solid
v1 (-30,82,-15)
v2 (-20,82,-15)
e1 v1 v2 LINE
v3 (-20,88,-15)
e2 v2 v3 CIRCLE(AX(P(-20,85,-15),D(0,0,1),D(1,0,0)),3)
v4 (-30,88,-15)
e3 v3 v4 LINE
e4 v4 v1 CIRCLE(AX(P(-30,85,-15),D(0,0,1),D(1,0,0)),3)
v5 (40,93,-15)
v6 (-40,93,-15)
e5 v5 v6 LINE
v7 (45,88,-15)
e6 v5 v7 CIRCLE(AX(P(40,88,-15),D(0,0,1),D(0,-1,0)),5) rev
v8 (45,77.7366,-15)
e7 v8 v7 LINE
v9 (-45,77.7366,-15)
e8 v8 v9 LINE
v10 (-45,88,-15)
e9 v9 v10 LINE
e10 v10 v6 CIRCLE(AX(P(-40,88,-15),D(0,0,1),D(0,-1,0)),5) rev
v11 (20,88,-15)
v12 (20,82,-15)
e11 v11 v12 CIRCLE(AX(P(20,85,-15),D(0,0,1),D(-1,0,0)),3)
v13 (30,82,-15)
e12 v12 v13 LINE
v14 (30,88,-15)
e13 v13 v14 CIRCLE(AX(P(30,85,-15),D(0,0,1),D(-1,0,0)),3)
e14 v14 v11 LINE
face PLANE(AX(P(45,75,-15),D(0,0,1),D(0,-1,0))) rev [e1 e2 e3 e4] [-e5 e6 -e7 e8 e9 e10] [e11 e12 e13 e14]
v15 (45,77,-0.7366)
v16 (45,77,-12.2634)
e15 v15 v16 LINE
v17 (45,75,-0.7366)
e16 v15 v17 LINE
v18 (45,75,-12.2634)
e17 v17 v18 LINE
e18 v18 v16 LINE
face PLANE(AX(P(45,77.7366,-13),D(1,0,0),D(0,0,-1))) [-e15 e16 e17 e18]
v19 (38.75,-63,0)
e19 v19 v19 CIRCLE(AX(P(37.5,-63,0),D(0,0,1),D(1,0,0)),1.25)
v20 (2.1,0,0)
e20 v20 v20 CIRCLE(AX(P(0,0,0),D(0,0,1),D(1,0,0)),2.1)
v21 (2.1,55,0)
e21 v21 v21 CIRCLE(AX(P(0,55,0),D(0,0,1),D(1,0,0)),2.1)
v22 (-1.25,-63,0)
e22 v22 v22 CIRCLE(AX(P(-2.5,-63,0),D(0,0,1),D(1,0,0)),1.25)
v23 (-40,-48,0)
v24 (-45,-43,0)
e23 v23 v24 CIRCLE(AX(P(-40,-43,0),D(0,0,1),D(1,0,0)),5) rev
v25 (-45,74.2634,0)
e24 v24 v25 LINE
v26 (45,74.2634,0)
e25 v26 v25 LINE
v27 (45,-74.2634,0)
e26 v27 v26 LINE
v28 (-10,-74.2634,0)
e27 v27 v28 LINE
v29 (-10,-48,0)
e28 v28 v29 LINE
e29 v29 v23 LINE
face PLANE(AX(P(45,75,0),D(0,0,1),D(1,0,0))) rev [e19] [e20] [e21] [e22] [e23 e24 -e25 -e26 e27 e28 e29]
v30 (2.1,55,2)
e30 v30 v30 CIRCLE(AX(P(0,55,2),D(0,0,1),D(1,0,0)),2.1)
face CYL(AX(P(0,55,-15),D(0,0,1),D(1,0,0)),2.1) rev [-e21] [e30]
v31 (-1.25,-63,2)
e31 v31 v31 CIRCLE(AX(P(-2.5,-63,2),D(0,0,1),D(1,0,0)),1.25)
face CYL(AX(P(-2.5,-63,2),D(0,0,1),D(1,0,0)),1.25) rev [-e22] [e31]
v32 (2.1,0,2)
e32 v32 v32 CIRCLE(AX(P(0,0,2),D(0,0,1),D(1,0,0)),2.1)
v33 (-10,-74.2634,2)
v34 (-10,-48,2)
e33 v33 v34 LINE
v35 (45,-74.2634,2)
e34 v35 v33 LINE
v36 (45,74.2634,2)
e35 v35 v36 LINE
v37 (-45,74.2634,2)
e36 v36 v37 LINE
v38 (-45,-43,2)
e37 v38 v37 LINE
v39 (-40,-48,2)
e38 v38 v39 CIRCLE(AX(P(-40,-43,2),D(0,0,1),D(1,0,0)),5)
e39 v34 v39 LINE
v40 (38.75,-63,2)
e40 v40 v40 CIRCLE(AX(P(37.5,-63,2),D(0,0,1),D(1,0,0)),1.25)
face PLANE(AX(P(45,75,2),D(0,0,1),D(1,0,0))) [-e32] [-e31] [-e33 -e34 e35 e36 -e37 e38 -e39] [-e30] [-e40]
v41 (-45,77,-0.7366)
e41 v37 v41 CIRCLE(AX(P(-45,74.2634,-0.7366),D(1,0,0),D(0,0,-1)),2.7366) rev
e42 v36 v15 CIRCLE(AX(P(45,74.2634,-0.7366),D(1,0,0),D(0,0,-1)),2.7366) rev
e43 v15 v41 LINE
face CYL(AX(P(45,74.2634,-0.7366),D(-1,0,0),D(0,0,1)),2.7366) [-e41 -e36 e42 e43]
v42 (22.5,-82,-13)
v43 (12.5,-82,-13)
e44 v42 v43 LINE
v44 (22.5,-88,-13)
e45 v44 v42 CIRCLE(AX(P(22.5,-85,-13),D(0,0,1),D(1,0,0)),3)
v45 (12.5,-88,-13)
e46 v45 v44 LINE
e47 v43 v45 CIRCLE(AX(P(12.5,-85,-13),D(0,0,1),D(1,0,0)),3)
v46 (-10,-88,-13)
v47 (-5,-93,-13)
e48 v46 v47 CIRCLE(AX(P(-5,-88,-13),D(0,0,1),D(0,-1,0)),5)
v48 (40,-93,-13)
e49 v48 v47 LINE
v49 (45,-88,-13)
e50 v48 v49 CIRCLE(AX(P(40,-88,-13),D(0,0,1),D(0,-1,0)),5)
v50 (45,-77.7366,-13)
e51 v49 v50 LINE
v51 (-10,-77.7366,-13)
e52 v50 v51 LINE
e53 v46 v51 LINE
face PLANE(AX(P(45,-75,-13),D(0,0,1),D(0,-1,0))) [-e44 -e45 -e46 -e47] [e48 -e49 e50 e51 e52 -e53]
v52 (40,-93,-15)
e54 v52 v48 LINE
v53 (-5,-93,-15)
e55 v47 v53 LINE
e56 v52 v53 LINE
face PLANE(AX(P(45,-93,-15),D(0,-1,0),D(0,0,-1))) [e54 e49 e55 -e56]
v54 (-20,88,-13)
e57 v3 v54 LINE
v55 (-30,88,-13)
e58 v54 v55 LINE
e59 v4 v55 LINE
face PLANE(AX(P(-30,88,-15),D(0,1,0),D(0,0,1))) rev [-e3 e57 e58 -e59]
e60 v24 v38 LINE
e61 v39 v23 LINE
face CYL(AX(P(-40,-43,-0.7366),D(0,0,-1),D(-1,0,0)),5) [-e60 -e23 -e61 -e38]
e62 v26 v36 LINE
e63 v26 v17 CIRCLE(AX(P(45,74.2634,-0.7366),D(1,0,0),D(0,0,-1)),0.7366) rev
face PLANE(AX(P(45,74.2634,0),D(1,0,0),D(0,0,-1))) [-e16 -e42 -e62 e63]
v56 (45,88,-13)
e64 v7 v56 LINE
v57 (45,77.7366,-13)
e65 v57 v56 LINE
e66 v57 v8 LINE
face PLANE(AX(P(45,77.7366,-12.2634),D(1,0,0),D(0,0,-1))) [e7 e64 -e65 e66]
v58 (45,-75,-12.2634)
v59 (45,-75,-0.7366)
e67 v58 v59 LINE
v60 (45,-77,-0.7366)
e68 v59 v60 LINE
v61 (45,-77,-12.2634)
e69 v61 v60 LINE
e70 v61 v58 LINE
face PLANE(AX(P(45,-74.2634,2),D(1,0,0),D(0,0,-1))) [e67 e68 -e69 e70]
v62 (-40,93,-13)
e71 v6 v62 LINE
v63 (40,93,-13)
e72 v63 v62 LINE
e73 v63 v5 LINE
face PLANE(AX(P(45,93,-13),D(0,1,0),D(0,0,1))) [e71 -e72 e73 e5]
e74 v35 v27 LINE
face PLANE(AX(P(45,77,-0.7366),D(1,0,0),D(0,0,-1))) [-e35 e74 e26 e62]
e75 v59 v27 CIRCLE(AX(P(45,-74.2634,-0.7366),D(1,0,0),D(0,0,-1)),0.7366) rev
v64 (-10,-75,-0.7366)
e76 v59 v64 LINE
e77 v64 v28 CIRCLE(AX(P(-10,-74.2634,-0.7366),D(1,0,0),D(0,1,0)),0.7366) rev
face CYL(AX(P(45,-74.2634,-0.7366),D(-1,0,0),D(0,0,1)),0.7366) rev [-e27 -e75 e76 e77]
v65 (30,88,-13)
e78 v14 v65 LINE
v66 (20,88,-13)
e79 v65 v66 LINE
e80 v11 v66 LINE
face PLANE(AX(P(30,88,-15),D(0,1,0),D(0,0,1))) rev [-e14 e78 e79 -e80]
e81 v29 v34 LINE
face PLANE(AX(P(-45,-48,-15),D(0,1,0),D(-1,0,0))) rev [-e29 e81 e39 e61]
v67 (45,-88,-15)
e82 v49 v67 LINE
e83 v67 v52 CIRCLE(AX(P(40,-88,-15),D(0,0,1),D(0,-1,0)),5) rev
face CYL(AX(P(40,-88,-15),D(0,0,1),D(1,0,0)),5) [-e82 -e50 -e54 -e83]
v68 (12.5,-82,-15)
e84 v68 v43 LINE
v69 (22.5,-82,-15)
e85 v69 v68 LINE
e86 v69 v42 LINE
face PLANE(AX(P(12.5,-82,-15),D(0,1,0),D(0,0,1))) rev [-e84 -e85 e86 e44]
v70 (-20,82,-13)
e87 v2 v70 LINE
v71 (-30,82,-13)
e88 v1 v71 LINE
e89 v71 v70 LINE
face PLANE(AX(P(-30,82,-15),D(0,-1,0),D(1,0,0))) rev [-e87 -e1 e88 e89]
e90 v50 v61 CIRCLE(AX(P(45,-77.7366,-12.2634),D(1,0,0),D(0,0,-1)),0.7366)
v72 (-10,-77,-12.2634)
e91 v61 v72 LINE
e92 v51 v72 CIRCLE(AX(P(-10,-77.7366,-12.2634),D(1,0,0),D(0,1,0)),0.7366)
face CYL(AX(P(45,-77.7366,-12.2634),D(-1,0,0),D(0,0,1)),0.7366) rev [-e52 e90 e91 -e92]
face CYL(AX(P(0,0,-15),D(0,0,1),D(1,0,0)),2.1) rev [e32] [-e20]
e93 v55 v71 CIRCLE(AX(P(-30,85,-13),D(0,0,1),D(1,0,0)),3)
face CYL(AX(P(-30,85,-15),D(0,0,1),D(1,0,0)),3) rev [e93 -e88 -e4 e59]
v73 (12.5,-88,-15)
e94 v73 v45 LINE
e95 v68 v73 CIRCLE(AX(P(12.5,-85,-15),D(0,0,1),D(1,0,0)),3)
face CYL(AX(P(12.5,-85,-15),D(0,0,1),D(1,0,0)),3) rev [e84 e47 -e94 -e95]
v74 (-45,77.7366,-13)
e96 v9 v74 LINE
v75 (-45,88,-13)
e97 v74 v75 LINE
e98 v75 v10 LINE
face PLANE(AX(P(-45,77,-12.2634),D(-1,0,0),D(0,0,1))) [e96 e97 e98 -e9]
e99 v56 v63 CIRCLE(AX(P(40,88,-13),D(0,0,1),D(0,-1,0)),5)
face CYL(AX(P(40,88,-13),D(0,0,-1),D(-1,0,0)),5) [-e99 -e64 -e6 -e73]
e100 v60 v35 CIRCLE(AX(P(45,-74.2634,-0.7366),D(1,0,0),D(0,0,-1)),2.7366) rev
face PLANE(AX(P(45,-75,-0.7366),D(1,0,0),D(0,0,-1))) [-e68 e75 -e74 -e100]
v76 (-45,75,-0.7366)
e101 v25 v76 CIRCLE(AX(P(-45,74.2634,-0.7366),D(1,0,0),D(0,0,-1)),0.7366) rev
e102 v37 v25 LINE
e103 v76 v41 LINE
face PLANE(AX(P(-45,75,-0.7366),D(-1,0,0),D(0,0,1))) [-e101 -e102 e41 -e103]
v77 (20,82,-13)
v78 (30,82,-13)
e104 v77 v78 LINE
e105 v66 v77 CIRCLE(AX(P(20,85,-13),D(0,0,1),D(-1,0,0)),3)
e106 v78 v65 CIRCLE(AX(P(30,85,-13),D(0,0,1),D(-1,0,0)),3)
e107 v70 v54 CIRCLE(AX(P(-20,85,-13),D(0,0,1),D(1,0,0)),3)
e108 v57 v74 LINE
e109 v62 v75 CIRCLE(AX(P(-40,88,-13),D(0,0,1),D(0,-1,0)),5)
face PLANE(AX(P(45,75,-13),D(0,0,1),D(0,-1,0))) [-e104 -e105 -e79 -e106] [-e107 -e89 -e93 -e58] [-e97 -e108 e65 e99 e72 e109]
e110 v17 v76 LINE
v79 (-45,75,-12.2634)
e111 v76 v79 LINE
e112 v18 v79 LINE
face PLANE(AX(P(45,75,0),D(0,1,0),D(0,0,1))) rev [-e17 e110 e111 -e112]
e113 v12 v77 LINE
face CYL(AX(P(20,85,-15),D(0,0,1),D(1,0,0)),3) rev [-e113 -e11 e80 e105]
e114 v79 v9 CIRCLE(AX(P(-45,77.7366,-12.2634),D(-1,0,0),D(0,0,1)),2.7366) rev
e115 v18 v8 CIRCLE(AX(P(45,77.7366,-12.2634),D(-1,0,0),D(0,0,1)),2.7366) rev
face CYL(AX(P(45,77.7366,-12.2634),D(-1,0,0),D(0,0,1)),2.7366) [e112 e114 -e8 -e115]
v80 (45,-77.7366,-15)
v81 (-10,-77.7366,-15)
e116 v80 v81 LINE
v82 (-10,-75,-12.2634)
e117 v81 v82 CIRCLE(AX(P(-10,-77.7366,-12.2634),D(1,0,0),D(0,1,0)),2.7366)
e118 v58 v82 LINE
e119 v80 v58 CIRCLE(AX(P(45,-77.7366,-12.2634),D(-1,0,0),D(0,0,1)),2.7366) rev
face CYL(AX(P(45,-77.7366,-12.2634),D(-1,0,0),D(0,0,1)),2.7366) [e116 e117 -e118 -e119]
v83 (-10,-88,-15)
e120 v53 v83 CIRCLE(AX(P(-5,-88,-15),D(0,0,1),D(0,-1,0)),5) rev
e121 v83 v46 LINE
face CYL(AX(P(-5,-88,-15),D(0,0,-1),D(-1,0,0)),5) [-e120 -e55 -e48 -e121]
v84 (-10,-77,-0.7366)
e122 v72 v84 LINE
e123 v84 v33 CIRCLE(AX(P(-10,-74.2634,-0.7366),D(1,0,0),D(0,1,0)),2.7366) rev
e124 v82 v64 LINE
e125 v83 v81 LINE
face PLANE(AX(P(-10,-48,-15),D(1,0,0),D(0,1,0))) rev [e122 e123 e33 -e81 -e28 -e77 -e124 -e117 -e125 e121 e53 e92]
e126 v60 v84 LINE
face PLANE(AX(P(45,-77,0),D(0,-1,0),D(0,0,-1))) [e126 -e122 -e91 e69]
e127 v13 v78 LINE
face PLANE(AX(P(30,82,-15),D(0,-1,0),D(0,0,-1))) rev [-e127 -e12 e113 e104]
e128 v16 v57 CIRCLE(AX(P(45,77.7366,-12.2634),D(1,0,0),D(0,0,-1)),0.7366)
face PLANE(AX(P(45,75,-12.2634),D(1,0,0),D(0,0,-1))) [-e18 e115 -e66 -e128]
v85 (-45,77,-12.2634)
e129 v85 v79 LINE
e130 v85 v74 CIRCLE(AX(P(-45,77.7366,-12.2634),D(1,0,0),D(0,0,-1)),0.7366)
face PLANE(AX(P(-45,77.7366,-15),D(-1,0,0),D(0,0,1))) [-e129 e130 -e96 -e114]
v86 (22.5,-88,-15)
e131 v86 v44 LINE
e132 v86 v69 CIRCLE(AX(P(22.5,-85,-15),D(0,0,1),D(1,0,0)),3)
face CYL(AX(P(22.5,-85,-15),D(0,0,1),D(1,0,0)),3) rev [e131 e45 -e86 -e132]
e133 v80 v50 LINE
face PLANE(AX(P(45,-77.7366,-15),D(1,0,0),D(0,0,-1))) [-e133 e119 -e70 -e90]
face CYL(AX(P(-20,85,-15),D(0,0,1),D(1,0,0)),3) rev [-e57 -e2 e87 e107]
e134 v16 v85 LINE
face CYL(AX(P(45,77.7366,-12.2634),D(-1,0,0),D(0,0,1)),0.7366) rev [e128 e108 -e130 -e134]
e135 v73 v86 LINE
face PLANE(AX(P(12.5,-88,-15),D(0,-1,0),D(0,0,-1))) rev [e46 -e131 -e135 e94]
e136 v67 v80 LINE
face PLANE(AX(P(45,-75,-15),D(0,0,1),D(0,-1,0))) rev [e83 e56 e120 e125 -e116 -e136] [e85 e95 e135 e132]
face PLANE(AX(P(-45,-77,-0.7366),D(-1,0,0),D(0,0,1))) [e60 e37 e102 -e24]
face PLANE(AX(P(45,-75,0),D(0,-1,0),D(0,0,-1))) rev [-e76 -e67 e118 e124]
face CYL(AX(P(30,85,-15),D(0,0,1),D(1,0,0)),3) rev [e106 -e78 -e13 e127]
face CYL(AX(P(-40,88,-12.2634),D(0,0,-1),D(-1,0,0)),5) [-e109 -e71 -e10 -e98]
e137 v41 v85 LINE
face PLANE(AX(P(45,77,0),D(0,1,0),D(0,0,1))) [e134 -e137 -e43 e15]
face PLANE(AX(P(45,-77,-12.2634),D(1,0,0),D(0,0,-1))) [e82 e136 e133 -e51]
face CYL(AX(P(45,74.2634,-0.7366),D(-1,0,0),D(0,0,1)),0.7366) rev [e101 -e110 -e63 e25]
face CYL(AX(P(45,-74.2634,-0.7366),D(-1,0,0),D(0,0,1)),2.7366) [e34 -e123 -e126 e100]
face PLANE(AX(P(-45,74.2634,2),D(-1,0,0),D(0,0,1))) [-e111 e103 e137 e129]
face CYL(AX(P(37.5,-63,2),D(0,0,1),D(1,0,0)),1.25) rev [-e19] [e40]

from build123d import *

# Parameters (mm, degrees)
SM_BASE_FLANGE_1_DEPTH = 45
SKETCH_3_R             = 2.1
CUT_EXTRUDE_1_DEPTH    = 105.70434566
SKETCH_4_W             = 35
SKETCH_4_H             = 45
CUT_EXTRUDE_2_DEPTH    = 105.70434566
M3X0_5_1_D             = 2.5
M3X0_5_1_DEPTH         = 7.5
M3X0_5_1_TIP           = 0.751075774
CUT_EXTRUDE_3_DEPTH    = 105.398275848
FILLET_1_R             = 5


# Sheet-metal steps are written as plain solids
with BuildPart() as part:
    # Sketch 1 → 基体-法兰1 (new, symmetric)
    with BuildSketch(Plane(origin=(0, 0, 0), x_dir=(0, 0, -1), z_dir=(1, 0, 0))):
        with BuildLine():
            Line((15, 93), (15, 77.7366))
            ThreePointArc((15, 77.7366), (14.198468417, 75.801531583), (12.2634, 75))
            Line((12.2634, 75), (0.7366, 75))
            ThreePointArc((0.7366, 75), (0.215745145, 74.784254855), (0, 74.2634))
            Line((0, 74.2634), (0, -74.2634))
            ThreePointArc((0, -74.2634), (0.215745145, -74.784254855), (0.7366, -75))
            Line((0.7366, -75), (12.2634, -75))
            ThreePointArc((12.2634, -75), (14.198468417, -75.801531583), (15, -77.7366))
            Line((15, -77.7366), (15, -93))
            Line((15, -93), (13, -93))
            Line((13, -93), (13, -77.7366))
            ThreePointArc((13, -77.7366), (12.784254855, -77.215745145), (12.2634, -77))
            Line((12.2634, -77), (0.7366, -77))
            ThreePointArc((0.7366, -77), (-1.198468417, -76.198468417), (-2, -74.2634))
            Line((-2, -74.2634), (-2, 74.2634))
            ThreePointArc((-2, 74.2634), (-1.198468417, 76.198468417), (0.7366, 77))
            Line((0.7366, 77), (12.2634, 77))
            ThreePointArc((12.2634, 77), (12.784254855, 77.215745145), (13, 77.7366))
            Line((13, 77.7366), (13, 93))
            Line((13, 93), (15, 93))
        make_face()
    extrude(amount=SM_BASE_FLANGE_1_DEPTH, both=True)

    # 草图3 → 切除-拉伸1 (cut, through all)
    with BuildSketch(Plane.XY.offset(2)):
        with Locations((0, 55)):
            Circle(SKETCH_3_R)
        Circle(SKETCH_3_R)
    extrude(amount=-CUT_EXTRUDE_1_DEPTH, mode=Mode.SUBTRACT)

    # 草图4 → 切除-拉伸2 (cut, through all)
    with BuildSketch(Plane.XY.offset(2)):
        with Locations((-27.5, -70.5)):
            Rectangle(SKETCH_4_W, SKETCH_4_H)
    extrude(amount=-CUT_EXTRUDE_2_DEPTH, mode=Mode.SUBTRACT)

    # M3x0.5 螺纹孔1
    with Locations(Plane.XY.offset(2)):
        with Locations((-2.5, -63), (37.5, -63)):
            Hole(M3X0_5_1_D / 2, depth=M3X0_5_1_DEPTH)
            with Locations((0, 0, -(M3X0_5_1_DEPTH + M3X0_5_1_TIP / 2))):  # 118° drill point
                Cone(0, M3X0_5_1_D / 2, M3X0_5_1_TIP, mode=Mode.SUBTRACT)

    # 草图7 → 切除-拉伸3 (cut, through all)
    with BuildSketch(Plane.XY.offset(-13)):
        with BuildLine():
            Line((-30, 88), (-20, 88))
            ThreePointArc((-20, 88), (-17, 85), (-20, 82))
            Line((-20, 82), (-30, 82))
            ThreePointArc((-30, 82), (-33, 85), (-30, 88))
        make_face()
        with BuildLine():
            Line((30, 88), (20, 88))
            ThreePointArc((20, 88), (17, 85), (20, 82))
            Line((20, 82), (30, 82))
            ThreePointArc((30, 82), (33, 85), (30, 88))
        make_face()
        with BuildLine():
            Line((12.5, -82), (22.5, -82))
            ThreePointArc((22.5, -82), (25.5, -85), (22.5, -88))
            Line((22.5, -88), (12.5, -88))
            ThreePointArc((12.5, -88), (9.5, -85), (12.5, -82))
        make_face()
    extrude(amount=-CUT_EXTRUDE_3_DEPTH, mode=Mode.SUBTRACT)

    # 圆角1
    fillet_1_edges = [part.edges().sort_by_distance(p)[0] for p in [
        (-45, 93, -14),
        (45, -93, -14),
        (45, 93, -14),
        (-45, -48, 1),
        (-10, -93, -14),
    ]]
    fillet(fillet_1_edges, radius=FILLET_1_R)


solid = part.part
